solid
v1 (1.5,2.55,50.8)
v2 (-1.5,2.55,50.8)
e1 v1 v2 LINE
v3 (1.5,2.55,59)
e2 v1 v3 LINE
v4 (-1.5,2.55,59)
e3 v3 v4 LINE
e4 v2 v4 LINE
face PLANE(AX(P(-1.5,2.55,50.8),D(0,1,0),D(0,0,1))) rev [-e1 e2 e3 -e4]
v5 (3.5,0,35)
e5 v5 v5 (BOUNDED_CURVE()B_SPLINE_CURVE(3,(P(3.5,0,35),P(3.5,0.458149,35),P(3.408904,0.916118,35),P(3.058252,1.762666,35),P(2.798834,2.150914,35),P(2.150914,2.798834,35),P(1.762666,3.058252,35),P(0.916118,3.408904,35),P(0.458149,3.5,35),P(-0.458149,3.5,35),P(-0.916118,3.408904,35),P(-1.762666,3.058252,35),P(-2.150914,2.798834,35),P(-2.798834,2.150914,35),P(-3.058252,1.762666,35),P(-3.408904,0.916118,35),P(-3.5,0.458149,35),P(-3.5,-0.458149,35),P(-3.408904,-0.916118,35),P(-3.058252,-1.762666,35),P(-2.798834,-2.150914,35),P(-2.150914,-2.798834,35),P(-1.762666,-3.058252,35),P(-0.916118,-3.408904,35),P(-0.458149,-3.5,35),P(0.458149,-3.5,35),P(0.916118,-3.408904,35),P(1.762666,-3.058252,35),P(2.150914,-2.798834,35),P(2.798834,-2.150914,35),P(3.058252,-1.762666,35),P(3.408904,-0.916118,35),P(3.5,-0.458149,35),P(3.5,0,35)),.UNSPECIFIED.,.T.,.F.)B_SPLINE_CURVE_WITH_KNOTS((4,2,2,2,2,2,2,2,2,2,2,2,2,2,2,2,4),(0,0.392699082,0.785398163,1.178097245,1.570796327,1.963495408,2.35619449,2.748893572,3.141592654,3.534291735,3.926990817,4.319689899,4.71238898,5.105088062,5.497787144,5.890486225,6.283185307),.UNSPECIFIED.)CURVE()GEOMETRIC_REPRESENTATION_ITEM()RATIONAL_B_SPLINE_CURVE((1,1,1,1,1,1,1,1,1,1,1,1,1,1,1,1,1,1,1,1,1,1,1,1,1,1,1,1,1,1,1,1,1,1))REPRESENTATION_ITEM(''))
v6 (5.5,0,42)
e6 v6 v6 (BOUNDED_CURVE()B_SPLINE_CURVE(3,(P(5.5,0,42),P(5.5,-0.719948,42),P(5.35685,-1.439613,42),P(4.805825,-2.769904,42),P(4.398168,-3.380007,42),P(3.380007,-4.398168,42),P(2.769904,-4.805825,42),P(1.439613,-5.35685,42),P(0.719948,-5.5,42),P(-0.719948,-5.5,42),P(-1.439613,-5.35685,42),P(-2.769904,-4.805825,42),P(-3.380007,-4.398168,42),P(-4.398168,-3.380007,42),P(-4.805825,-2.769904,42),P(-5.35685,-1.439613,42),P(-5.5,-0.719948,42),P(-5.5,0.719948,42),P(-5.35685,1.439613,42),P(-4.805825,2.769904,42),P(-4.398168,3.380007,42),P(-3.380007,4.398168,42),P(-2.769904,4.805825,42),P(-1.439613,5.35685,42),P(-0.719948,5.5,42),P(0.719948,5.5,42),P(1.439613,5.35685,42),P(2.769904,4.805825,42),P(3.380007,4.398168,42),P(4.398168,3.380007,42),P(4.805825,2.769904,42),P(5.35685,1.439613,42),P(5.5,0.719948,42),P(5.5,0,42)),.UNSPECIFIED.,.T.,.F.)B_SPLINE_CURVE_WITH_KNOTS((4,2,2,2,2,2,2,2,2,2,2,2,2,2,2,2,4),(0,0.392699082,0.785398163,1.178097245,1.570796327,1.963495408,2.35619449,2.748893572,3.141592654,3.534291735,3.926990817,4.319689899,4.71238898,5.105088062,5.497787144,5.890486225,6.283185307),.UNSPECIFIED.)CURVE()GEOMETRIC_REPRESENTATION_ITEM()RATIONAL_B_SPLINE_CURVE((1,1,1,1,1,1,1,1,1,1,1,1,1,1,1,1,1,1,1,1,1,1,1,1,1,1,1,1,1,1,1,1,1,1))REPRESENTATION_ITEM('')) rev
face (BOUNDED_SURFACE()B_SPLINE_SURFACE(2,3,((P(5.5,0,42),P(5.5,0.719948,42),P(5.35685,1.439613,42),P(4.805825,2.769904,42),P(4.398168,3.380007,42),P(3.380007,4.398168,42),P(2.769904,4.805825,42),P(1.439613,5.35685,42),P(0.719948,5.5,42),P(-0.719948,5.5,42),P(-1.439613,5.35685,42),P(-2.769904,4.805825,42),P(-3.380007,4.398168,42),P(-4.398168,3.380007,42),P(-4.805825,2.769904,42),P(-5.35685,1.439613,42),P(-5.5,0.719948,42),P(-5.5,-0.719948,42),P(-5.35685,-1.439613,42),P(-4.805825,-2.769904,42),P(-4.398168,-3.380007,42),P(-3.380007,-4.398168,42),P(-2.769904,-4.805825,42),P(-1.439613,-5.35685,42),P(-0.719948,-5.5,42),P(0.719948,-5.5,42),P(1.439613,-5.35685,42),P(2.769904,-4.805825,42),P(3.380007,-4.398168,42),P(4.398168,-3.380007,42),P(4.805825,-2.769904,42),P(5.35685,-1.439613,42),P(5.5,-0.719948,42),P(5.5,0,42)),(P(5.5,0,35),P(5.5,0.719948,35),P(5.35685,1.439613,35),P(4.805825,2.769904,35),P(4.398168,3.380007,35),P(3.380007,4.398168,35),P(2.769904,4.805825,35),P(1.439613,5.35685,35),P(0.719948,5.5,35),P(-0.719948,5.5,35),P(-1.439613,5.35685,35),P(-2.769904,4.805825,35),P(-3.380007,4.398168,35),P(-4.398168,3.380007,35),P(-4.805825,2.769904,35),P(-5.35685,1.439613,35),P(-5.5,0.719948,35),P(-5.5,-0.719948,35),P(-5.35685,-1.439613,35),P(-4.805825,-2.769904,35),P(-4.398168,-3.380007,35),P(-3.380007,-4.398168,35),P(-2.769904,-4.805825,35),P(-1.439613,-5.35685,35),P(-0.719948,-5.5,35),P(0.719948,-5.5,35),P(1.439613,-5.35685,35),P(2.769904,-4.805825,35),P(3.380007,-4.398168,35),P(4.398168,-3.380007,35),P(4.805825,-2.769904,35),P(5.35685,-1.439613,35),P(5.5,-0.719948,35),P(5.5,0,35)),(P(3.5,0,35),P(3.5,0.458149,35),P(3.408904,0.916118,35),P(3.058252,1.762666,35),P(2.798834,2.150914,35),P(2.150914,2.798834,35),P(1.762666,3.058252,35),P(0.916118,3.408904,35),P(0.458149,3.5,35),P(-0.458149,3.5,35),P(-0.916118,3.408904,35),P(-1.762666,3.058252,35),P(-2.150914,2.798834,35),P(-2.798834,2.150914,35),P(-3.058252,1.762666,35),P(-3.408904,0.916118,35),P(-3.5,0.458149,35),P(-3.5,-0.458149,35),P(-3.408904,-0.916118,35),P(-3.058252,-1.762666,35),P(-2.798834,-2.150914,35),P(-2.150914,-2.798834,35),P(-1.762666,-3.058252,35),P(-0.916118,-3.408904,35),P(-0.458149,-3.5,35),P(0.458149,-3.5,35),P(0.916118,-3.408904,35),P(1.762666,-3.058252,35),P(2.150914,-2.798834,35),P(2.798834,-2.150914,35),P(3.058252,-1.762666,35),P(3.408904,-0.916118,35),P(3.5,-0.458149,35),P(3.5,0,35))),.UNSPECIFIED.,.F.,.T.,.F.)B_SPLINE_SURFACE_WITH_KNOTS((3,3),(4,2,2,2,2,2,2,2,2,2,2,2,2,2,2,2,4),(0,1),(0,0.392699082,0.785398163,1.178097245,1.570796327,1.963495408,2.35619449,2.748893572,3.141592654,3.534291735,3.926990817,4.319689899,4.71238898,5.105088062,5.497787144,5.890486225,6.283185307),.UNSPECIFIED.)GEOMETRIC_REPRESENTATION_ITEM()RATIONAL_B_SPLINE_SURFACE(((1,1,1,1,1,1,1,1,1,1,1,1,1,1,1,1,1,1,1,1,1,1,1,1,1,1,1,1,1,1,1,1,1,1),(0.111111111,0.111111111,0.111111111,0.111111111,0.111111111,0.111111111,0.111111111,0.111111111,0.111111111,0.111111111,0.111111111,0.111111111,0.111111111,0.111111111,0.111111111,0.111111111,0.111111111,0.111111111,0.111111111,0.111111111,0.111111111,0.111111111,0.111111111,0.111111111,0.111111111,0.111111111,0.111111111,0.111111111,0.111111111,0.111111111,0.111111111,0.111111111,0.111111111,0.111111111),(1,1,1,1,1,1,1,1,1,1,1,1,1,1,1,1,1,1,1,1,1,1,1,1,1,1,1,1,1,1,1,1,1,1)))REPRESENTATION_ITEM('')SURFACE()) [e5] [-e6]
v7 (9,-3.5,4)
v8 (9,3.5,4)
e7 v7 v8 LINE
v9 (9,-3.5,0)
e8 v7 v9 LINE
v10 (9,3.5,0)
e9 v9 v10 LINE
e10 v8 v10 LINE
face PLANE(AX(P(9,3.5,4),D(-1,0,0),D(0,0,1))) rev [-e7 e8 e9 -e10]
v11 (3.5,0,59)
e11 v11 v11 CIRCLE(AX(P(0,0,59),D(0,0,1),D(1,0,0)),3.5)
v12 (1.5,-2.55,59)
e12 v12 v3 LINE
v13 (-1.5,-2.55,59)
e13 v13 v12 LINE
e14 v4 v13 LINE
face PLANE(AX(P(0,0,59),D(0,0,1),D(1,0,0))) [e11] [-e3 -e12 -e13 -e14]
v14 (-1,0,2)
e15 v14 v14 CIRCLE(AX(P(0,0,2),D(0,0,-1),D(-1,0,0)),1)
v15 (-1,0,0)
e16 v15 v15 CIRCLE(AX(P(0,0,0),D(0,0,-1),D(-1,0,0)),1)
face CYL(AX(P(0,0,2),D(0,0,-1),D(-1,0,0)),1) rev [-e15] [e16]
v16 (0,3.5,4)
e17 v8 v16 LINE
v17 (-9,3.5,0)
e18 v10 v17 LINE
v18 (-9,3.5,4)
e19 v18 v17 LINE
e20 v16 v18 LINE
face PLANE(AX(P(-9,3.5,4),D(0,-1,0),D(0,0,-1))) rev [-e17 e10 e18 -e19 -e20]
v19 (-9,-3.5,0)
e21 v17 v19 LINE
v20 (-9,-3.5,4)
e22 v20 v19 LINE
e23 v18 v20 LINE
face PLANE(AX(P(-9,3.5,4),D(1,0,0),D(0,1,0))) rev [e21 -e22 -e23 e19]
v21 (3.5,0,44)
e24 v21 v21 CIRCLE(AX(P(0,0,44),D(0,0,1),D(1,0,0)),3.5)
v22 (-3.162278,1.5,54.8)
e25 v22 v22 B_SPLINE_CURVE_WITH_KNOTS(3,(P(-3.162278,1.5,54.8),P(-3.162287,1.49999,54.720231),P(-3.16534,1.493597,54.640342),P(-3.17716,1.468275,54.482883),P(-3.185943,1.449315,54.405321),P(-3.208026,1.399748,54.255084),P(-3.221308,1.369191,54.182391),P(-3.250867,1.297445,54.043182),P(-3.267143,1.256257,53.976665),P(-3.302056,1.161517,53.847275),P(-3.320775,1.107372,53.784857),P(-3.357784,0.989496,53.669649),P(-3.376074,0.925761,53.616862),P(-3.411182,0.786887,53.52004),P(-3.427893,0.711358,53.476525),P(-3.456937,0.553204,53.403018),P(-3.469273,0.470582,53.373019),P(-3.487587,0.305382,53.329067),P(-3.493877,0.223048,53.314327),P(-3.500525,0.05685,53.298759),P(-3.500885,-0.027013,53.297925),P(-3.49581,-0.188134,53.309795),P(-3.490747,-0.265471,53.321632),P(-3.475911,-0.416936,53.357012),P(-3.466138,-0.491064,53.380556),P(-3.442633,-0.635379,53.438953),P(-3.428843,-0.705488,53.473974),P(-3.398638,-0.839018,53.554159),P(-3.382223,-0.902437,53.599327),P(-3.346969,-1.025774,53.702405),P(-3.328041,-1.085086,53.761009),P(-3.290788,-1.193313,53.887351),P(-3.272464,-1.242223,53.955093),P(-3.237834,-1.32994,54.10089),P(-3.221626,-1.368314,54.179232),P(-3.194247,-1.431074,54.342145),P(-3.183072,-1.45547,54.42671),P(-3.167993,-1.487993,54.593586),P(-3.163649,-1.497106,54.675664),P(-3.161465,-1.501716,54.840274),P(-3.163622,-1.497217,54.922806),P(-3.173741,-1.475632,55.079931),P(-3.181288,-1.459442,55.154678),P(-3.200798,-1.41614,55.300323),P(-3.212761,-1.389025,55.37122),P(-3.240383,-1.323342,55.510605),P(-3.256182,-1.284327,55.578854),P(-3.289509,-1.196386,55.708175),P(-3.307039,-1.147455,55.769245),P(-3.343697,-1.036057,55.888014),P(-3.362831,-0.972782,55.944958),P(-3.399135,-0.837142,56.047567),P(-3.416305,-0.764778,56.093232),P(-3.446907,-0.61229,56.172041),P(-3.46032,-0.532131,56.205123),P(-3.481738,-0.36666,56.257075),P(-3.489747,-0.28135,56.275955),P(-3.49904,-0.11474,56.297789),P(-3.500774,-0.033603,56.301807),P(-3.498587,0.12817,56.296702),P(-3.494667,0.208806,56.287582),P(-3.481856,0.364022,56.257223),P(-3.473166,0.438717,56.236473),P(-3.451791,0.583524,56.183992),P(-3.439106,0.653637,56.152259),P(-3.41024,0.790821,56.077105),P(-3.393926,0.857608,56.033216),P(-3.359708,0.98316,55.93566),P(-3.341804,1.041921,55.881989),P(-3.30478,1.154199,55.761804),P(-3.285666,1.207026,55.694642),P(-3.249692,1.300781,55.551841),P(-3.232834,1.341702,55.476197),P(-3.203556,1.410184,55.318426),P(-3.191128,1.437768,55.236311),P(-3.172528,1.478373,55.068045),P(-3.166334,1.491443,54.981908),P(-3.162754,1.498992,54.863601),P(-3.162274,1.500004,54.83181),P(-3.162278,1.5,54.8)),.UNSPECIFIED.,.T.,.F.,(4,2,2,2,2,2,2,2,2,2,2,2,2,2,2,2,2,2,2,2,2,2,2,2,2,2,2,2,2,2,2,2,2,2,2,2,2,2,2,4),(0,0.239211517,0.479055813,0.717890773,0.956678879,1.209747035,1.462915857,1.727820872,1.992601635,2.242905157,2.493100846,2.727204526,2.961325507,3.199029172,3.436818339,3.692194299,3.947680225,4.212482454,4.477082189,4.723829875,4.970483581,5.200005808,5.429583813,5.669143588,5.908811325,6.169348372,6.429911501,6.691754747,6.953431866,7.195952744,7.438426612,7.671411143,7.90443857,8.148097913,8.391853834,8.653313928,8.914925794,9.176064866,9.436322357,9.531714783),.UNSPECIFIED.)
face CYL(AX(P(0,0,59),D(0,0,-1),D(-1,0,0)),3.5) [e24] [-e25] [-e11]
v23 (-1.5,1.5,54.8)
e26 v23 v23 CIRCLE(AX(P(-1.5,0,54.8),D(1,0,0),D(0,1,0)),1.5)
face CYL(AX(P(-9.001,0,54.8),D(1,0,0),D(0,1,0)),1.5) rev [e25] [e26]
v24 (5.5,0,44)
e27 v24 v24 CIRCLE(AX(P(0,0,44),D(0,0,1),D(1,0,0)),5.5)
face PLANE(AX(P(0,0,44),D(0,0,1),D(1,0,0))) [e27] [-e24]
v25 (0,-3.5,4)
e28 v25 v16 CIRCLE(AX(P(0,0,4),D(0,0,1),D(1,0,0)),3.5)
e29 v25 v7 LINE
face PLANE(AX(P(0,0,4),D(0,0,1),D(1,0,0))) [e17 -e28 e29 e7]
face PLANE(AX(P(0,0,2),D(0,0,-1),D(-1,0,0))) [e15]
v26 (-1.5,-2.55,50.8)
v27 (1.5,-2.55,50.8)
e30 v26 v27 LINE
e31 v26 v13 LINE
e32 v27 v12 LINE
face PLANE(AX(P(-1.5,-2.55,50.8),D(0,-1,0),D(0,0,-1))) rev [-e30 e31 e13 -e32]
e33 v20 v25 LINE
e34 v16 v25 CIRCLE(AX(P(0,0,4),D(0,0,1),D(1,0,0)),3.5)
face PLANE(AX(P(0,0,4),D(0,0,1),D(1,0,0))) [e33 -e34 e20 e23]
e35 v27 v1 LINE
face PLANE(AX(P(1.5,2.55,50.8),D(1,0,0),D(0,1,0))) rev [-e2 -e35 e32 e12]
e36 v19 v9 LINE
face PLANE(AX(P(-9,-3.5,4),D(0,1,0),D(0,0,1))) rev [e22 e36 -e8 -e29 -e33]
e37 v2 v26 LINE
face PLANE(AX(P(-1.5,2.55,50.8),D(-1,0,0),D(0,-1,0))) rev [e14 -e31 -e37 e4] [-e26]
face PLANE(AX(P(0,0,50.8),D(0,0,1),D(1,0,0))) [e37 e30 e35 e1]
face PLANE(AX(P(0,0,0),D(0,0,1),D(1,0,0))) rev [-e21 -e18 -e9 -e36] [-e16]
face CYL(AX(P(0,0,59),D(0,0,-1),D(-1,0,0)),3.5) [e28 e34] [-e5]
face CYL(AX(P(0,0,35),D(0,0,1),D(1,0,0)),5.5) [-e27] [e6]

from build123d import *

# Parameters (mm, degrees)
SCHIZZO2_W                    = 18
SCHIZZO2_H                    = 7
ESTRUSIONE_ESTRUSIONE1_DEPTH  = 4
SCHIZZO3_R                    = 3.5
ESTRUSIONE_ESTRUSIONE2_DEPTH  = 55
SCHIZZO4_W                    = 3
SCHIZZO4_H                    = 5.1
TAGLIO_ESTRUSIONE1_DEPTH      = 8.2
TAGLIO_ESTRUSIONE2_REACH      = 62.029
TAGLIO_ESTRUSIONE2_END_RADIUS = 3.5
SCHIZZO5_R                    = 1.5
SCHIZZO6_R                    = 5.5
ESTRUSIONE_ESTRUSIONE3_DEPTH  = 9
RACCORDO1_SIZE                = 2
RACCORDO1_SIZE_2              = 7
SCHIZZO7_R                    = 1
TAGLIO_ESTRUSIONE3_DEPTH      = 2


with BuildPart() as part:
    # Schizzo2 → Estrusione-Estrusione1 (new body)
    with BuildSketch(Plane.XY):
        Rectangle(SCHIZZO2_W, SCHIZZO2_H)
    extrude(amount=ESTRUSIONE_ESTRUSIONE1_DEPTH)

    # Schizzo3 → Estrusione-Estrusione2 (add)
    with BuildSketch(Plane.XY.offset(4)):
        with Locations(Location((0, 0, 0), (0, 0, 270))):
            Circle(SCHIZZO3_R)
    extrude(amount=ESTRUSIONE_ESTRUSIONE2_DEPTH)

    # Schizzo4 → Taglio-Estrusione1 (cut)
    with BuildSketch(Plane.XY.offset(59)):
        Rectangle(SCHIZZO4_W, SCHIZZO4_H)
    extrude(amount=-TAGLIO_ESTRUSIONE1_DEPTH, mode=Mode.SUBTRACT)

    # Taglio-Estrusione2: up to this cylinder (the profile starts inside it)
    taglio_estrusione2_end = Plane(origin=(0, 0, 54.8), z_dir=(0, 0, -1)) * Cylinder(TAGLIO_ESTRUSIONE2_END_RADIUS, 132.058, mode=Mode.PRIVATE)
    # Schizzo5 → Taglio-Estrusione2 (cut, up to the surface)
    with BuildSketch(Plane(origin=(-1.5, 0, 0), x_dir=(0, 0, -1), z_dir=(1, 0, 0)), mode=Mode.PRIVATE) as taglio_estrusione2_sk1:
        with Locations(Location((-54.8, 0, 0), (0, 0, 90))):
            Circle(SCHIZZO5_R)
    taglio_estrusione2_tool1 = extrude(taglio_estrusione2_sk1.sketch, amount=-TAGLIO_ESTRUSIONE2_REACH, mode=Mode.PRIVATE) & taglio_estrusione2_end
    add(taglio_estrusione2_tool1.solids().sort_by_distance((-1.5, 0, 54.8))[0], mode=Mode.SUBTRACT)

    # Schizzo6 → Estrusione-Estrusione3 (add)
    with BuildSketch(Plane.XY.offset(44)):
        Circle(SCHIZZO6_R)
    extrude(amount=-ESTRUSIONE_ESTRUSIONE3_DEPTH)

    # Raccordo1
    # a fillet whose section is not a circle: 7, 2 mm, written as the material it takes off along each edge
    with BuildSketch(Plane(origin=(0, 0, 35), x_dir=(1, 0, 0), z_dir=(0, -1, 0))) as raccordo1_piece_1_section:
        with BuildLine():
            Bezier((5.5 - RACCORDO1_SIZE, 0), (5.5, 0), (5.5, RACCORDO1_SIZE_2), weights=[1, 0.111111111, 1])
            Line((5.5, RACCORDO1_SIZE_2), (5.5, 0))
            Line((5.5, 0), (5.5 - RACCORDO1_SIZE, 0))
        make_face()
    raccordo1_piece_1 = revolve(axis=Axis((0, 0, 35), (0, 0, 1)), mode=Mode.PRIVATE)
    raccordo1_piece_1 = raccordo1_piece_1 - Plane(origin=(0, 0, 35), x_dir=(0, -1, 0), z_dir=(0, 0, -1)) * Cylinder(3.5, 28, mode=Mode.PRIVATE)
    add(raccordo1_piece_1, mode=Mode.SUBTRACT)

    # Schizzo7 → Taglio-Estrusione3 (cut)
    with BuildSketch(Plane(origin=(0, 0, 0), x_dir=(-1, 0, 0), z_dir=(0, 0, -1))):
        Circle(SCHIZZO7_R)
    extrude(amount=-TAGLIO_ESTRUSIONE3_DEPTH, mode=Mode.SUBTRACT)


solid = part.part
